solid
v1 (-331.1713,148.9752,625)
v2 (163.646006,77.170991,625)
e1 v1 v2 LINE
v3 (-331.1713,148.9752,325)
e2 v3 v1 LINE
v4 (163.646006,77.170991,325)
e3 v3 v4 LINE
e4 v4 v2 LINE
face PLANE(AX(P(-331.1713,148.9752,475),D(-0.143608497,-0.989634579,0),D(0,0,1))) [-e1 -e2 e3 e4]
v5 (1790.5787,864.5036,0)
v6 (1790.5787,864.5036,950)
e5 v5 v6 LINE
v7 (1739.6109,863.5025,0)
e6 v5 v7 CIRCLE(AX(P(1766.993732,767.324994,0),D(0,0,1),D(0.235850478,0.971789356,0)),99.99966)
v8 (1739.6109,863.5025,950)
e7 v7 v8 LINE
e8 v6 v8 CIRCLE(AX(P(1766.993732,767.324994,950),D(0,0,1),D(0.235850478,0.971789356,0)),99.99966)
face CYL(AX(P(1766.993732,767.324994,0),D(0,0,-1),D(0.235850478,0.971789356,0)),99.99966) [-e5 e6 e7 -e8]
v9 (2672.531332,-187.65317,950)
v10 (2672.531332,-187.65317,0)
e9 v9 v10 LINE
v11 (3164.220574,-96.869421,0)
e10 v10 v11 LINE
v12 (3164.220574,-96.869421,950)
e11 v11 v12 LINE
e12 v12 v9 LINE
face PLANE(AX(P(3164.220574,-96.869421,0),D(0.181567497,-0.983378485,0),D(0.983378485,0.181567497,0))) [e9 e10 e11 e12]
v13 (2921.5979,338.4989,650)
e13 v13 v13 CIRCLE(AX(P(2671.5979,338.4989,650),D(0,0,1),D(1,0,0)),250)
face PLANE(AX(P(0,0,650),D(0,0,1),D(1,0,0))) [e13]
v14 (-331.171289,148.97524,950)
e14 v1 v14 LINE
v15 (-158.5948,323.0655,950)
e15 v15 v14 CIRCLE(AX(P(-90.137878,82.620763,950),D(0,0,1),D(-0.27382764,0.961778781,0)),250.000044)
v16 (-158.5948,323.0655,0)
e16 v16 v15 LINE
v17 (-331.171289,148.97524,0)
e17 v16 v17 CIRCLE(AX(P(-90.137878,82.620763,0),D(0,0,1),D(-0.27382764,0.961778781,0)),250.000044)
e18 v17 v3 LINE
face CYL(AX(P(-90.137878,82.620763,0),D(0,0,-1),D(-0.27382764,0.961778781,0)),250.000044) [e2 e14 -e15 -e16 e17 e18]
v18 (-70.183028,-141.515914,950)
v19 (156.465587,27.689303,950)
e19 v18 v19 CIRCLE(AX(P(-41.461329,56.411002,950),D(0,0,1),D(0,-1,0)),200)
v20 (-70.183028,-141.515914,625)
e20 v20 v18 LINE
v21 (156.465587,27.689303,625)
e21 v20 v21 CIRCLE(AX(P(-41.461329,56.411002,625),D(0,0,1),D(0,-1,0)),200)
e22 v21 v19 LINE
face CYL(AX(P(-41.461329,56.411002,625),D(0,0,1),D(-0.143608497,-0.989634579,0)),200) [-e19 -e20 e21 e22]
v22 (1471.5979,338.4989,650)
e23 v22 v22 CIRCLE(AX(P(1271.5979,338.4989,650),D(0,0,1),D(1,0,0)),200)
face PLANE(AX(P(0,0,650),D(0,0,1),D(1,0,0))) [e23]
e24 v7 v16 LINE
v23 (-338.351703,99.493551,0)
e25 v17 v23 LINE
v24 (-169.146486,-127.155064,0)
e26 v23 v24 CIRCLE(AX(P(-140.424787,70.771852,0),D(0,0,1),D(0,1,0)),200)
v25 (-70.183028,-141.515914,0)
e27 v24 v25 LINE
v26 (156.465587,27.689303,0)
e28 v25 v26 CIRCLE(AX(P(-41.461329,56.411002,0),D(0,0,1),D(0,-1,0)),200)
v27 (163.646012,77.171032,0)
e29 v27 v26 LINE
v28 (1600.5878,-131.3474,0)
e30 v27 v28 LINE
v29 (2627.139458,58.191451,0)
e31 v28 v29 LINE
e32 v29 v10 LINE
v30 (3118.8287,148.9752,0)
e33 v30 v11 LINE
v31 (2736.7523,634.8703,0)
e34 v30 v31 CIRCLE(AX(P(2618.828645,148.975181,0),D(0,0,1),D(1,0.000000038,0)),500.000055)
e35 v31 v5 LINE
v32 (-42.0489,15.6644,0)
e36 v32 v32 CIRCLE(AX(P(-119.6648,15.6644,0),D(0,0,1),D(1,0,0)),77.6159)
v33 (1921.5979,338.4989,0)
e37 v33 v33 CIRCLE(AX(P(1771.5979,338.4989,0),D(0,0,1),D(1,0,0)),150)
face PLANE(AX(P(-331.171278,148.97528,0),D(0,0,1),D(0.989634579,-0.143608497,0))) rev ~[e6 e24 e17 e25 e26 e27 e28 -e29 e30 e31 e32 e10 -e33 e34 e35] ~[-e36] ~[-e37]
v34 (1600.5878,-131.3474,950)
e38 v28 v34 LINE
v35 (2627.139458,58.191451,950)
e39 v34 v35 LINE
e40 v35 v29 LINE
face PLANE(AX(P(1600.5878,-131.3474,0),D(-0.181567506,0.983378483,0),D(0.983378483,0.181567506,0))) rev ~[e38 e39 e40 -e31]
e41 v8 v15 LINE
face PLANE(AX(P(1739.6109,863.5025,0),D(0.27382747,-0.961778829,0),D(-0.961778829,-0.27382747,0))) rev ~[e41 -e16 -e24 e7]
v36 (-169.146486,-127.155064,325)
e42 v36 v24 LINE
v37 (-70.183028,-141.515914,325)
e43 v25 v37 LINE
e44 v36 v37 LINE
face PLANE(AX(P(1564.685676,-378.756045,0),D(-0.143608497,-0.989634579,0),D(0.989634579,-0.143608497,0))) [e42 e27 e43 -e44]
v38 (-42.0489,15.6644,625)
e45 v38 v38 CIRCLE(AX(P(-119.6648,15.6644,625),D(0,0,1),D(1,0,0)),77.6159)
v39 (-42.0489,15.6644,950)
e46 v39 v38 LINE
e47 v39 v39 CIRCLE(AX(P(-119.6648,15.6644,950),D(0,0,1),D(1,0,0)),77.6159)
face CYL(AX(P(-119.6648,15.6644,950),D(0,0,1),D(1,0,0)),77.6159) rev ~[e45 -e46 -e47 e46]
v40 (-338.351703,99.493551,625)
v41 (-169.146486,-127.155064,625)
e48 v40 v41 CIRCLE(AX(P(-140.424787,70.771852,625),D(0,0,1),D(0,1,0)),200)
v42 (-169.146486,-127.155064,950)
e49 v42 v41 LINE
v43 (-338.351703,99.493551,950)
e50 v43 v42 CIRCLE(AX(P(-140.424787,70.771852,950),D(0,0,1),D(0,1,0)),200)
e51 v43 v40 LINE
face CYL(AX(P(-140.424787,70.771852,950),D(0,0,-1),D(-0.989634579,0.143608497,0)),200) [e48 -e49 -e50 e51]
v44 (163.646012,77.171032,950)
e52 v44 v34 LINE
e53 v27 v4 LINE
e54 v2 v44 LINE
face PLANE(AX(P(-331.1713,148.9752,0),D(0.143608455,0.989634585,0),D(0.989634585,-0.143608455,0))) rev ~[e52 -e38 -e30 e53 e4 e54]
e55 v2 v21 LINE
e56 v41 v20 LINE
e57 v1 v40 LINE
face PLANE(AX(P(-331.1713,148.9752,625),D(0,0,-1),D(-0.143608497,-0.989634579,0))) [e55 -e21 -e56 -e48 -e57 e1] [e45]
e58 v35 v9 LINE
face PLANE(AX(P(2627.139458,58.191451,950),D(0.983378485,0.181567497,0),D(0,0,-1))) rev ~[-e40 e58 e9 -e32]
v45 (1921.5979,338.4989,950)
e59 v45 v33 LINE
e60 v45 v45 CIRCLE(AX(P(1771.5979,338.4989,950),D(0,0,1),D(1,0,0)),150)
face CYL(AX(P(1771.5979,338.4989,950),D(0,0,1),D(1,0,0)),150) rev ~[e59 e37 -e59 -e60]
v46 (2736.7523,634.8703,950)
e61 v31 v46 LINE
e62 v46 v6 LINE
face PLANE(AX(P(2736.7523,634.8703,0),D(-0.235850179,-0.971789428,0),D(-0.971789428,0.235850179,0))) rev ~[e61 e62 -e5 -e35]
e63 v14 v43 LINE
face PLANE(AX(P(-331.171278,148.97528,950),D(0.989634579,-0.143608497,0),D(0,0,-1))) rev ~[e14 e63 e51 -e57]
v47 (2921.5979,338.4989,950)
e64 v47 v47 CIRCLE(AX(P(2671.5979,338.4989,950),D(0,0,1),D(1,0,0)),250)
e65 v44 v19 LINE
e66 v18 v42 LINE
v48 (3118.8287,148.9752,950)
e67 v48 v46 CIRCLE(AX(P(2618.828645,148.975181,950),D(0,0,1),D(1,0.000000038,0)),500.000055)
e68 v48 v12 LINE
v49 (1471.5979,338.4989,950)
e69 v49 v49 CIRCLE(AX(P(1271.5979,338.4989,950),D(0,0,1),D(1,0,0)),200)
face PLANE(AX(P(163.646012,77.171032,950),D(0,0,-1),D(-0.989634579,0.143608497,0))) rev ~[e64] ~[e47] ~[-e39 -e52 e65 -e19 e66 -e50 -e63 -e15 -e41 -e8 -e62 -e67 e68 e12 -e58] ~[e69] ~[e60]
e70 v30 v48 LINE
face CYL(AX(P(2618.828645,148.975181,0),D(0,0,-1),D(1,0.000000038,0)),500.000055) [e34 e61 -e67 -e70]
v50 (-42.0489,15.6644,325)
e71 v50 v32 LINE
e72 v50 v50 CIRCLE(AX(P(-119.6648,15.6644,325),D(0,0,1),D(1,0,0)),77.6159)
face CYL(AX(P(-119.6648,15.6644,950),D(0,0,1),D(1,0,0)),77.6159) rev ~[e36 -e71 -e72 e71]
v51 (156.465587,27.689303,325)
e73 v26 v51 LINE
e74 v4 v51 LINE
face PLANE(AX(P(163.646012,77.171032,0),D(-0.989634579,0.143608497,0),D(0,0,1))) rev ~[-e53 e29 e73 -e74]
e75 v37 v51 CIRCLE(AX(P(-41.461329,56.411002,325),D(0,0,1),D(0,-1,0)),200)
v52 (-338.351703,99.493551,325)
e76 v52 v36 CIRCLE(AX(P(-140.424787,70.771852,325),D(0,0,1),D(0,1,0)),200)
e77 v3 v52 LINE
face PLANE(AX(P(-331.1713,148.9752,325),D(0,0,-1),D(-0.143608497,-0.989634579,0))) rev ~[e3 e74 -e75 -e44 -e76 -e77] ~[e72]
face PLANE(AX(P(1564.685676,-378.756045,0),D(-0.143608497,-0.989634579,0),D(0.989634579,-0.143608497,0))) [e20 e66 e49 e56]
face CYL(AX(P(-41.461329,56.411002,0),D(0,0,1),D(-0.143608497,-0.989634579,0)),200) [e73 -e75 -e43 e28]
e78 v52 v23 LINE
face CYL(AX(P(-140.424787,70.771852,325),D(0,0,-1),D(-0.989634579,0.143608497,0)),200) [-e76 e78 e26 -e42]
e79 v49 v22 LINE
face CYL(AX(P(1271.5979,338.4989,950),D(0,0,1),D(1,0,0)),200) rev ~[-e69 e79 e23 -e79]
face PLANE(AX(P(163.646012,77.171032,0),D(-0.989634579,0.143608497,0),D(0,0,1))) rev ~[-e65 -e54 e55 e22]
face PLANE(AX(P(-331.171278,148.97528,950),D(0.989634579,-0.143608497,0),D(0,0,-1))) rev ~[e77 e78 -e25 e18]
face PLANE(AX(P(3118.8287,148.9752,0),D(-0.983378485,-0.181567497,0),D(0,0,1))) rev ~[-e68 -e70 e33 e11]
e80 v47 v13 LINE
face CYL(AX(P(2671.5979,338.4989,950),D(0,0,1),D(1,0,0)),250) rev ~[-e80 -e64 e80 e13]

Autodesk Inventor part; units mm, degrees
ref_plane "YZ Plane" through (0, 0, 0) normal (1, 0, 0) x (0, 1, 0)
ref_plane "XZ Plane" through (0, 0, 0) normal (0, 1, 0) x (-1, 0, 0)
ref_plane "XY Plane" through (0, 0, 0) normal (0, 0, 1) x (1, 0, 0)
sketch "Skizze1" plane through (0, 0, 0) normal (0, 0, 1) x (1, 0, 0)
  arc A0 (3118.8287, 148.9752) -> (2736.7523, 634.8703) centre (2618.8287, 148.9752) ccw
  line L0 (2736.7523, 634.8703) -> (1790.5787, 864.5036)
  line L1 (1739.6109, 863.5025) -> (-158.5948, 323.0655)
  arc A1 (-158.5948, 323.0655) -> (-331.1713, 148.9752) centre (-90.1379, 82.6208) ccw
  arc A2 (1765.4752, 870.5961) -> (1764.4558, 870.5761) centre (1765.0035, 868.6526) ccw
  arc A3 (1790.5787, 864.5036) -> (1739.6109, 863.5025) centre (1766.9937, 767.3247) ccw
  line L2 (-331.1713, 148.9752) -> (1600.5878, -131.3474)
  line L3 (1600.5878, -131.3474) -> (3118.8287, 148.9752)
  point P0 (0, 0)
  point P1 (1764.9629, 870.7205)
  dimension "d1" = 1000
  dimension "d2" = 2000
  dimension "d3" = 500
  dimension "d4" = 250
extrude "Extrusion1" add sketch "Skizze1" along normal blind 950
sketch "Skizze2" plane through (3118.8287, 148.9752, 0) normal (0.1815675, -0.9833785, 0) x (0.9833785, 0.1815675, 0)
  line L0 (-1543.9029, 950) -> (0, 950) construction
  line L1 (-1543.9029, 0) -> (0, 0) construction
  line L2 (0, 950) -> (-500, 950)
  line L3 (-500, 950) -> (-500, 0)
  line L4 (-500, 0) -> (0, 0)
  line L5 (0, 0) -> (0, 950)
  line L6 (-3191.3386, 950) -> (-3392.6558, 950) projected
  line L7 (-1226.5582, 0) -> (-3191.3386, 0) construction
  line L8 (-3392.6558, 950) -> (-2892.6558, 950)
  line L9 (-2892.6558, 950) -> (-2892.6558, 0)
  line L10 (-2892.6558, 0) -> (-3392.6558, 0)
  line L11 (-3392.6558, 0) -> (-3392.6558, 950)
  point P0 (-3094.0381, 0)
  dimension "d16" = 500
  dimension "d17" = 500
extrude "Extrusion2" add sketch "Skizze2" along normal blind 250 contours L5 L4 L3 L2
sketch "Skizze3" plane through (1600.5878, -131.3474, 0) normal (-0.1436085, -0.9896346, 0) x (0.9896346, -0.1436085, 0)
  line L0 (-1951.9923, 0) -> (0, 0) construction
  line L1 (-1951.9923, 950) -> (0, 950) construction
  line L2 (-1951.9923, 0) -> (-1451.9923, 0)
  line L3 (-1451.9923, 0) -> (-1451.9923, 950)
  line L4 (-1451.9923, 950) -> (-1951.9923, 950)
  line L5 (-1951.9923, 950) -> (-1951.9923, 0)
  point P0 (-1602.8597, 0)
  dimension "d20" = 500
extrude "Extrusion3" add sketch "Skizze3" along normal blind 250
sketch "Skizze4" plane through (-331.1713, 148.9752, 0) normal (-0.9896346, 0.1436085, 0) x (0, 0, 1)
  line L0 (0, 0) -> (0, 197.0692) construction
  line L1 (950, 0) -> (950, -250) projected
  line L2 (0, 0) -> (950, 0)
  line L3 (950, 0) -> (950, -250)
  line L4 (950, -250) -> (0, -250)
  line L5 (0, -250) -> (0, 0)
  point P0 (0, -99.872)
sketch "Skizze5" plane through (0, 0, 950) normal (0, 0, 1) x (1, 0, 0)
  line L0 (163.646, 77.171) -> (1600.5878, -131.3474) construction
  line L1 (1600.5878, -131.3474) -> (2100.5878, -131.3474) construction
  circle A0 centre (1771.5979, 338.4989) radius 150
  point P0 (0, 0)
  dimension "d25" = 300
extrude "Extrusion4" cut sketch "Skizze5" against normal through all
sketch "Skizze6" plane through (0, 0, 950) normal (0, 0, 1) x (1, 0, 0)
  circle A0 centre (-119.6648, 15.6644) radius 77.6159
  point P0 (0, 0)
extrude "Extrusion5" cut sketch "Skizze6" against normal through all
sketch "Skizze7" plane through (-331.1713, 148.9752, 0) normal (-0.9896346, 0.1436085, 0) x (0, 0, 1)
  point P0 (0, -99.872)
sketch "Skizze8" plane through (-331.1713, 148.9752, 0) normal (-0.9896346, 0.1436085, 0) x (0, 0, 1)
  line L0 (950, 0) -> (0, 0) construction
  line L1 (0, -250) -> (950, -250) construction
  line L2 (475, 0) -> (625, 0)
  line L3 (625, 0) -> (625, -250)
  line L4 (625, -250) -> (475, -250)
  line L5 (475, -250) -> (475, 0)
  line L6 (475, 0) -> (325, 0)
  line L7 (325, 0) -> (325, -250)
  line L8 (325, -250) -> (475, -250)
  line L9 (475, -250) -> (475, 0)
  point P0 (0, -99.872)
  dimension "d31" = 150
  dimension "d32" = 150
extrude "Extrusion6" cut sketch "Skizze8" against normal through all
fillet "Rundung1" radius 200 4 edges at (-367.0734, -98.4335, 787.5) (-367.0734, -98.4335, 162.5) (127.7439, -170.2377, 162.5) (127.7439, -170.2377, 787.5)
sketch "Skizze9" plane through (0, 0, 950) normal (0, 0, 1) x (1, 0, 0)
  circle A0 centre (1271.5979, 338.4989) radius 200
  point P0 (0, 0)
  dimension "d37" = 400
extrude "Extrusion7" cut sketch "Skizze9" against normal blind 300
sketch "Skizze10" plane through (0, 0, 950) normal (0, 0, 1) x (1, 0, 0)
  circle A0 centre (2671.5979, 338.4989) radius 250
  point P0 (0, 0)
  dimension "d41" = 500
extrude "Extrusion8" cut sketch "Skizze10" against normal blind 300
properties part number "Bauteil 2 geändert"
